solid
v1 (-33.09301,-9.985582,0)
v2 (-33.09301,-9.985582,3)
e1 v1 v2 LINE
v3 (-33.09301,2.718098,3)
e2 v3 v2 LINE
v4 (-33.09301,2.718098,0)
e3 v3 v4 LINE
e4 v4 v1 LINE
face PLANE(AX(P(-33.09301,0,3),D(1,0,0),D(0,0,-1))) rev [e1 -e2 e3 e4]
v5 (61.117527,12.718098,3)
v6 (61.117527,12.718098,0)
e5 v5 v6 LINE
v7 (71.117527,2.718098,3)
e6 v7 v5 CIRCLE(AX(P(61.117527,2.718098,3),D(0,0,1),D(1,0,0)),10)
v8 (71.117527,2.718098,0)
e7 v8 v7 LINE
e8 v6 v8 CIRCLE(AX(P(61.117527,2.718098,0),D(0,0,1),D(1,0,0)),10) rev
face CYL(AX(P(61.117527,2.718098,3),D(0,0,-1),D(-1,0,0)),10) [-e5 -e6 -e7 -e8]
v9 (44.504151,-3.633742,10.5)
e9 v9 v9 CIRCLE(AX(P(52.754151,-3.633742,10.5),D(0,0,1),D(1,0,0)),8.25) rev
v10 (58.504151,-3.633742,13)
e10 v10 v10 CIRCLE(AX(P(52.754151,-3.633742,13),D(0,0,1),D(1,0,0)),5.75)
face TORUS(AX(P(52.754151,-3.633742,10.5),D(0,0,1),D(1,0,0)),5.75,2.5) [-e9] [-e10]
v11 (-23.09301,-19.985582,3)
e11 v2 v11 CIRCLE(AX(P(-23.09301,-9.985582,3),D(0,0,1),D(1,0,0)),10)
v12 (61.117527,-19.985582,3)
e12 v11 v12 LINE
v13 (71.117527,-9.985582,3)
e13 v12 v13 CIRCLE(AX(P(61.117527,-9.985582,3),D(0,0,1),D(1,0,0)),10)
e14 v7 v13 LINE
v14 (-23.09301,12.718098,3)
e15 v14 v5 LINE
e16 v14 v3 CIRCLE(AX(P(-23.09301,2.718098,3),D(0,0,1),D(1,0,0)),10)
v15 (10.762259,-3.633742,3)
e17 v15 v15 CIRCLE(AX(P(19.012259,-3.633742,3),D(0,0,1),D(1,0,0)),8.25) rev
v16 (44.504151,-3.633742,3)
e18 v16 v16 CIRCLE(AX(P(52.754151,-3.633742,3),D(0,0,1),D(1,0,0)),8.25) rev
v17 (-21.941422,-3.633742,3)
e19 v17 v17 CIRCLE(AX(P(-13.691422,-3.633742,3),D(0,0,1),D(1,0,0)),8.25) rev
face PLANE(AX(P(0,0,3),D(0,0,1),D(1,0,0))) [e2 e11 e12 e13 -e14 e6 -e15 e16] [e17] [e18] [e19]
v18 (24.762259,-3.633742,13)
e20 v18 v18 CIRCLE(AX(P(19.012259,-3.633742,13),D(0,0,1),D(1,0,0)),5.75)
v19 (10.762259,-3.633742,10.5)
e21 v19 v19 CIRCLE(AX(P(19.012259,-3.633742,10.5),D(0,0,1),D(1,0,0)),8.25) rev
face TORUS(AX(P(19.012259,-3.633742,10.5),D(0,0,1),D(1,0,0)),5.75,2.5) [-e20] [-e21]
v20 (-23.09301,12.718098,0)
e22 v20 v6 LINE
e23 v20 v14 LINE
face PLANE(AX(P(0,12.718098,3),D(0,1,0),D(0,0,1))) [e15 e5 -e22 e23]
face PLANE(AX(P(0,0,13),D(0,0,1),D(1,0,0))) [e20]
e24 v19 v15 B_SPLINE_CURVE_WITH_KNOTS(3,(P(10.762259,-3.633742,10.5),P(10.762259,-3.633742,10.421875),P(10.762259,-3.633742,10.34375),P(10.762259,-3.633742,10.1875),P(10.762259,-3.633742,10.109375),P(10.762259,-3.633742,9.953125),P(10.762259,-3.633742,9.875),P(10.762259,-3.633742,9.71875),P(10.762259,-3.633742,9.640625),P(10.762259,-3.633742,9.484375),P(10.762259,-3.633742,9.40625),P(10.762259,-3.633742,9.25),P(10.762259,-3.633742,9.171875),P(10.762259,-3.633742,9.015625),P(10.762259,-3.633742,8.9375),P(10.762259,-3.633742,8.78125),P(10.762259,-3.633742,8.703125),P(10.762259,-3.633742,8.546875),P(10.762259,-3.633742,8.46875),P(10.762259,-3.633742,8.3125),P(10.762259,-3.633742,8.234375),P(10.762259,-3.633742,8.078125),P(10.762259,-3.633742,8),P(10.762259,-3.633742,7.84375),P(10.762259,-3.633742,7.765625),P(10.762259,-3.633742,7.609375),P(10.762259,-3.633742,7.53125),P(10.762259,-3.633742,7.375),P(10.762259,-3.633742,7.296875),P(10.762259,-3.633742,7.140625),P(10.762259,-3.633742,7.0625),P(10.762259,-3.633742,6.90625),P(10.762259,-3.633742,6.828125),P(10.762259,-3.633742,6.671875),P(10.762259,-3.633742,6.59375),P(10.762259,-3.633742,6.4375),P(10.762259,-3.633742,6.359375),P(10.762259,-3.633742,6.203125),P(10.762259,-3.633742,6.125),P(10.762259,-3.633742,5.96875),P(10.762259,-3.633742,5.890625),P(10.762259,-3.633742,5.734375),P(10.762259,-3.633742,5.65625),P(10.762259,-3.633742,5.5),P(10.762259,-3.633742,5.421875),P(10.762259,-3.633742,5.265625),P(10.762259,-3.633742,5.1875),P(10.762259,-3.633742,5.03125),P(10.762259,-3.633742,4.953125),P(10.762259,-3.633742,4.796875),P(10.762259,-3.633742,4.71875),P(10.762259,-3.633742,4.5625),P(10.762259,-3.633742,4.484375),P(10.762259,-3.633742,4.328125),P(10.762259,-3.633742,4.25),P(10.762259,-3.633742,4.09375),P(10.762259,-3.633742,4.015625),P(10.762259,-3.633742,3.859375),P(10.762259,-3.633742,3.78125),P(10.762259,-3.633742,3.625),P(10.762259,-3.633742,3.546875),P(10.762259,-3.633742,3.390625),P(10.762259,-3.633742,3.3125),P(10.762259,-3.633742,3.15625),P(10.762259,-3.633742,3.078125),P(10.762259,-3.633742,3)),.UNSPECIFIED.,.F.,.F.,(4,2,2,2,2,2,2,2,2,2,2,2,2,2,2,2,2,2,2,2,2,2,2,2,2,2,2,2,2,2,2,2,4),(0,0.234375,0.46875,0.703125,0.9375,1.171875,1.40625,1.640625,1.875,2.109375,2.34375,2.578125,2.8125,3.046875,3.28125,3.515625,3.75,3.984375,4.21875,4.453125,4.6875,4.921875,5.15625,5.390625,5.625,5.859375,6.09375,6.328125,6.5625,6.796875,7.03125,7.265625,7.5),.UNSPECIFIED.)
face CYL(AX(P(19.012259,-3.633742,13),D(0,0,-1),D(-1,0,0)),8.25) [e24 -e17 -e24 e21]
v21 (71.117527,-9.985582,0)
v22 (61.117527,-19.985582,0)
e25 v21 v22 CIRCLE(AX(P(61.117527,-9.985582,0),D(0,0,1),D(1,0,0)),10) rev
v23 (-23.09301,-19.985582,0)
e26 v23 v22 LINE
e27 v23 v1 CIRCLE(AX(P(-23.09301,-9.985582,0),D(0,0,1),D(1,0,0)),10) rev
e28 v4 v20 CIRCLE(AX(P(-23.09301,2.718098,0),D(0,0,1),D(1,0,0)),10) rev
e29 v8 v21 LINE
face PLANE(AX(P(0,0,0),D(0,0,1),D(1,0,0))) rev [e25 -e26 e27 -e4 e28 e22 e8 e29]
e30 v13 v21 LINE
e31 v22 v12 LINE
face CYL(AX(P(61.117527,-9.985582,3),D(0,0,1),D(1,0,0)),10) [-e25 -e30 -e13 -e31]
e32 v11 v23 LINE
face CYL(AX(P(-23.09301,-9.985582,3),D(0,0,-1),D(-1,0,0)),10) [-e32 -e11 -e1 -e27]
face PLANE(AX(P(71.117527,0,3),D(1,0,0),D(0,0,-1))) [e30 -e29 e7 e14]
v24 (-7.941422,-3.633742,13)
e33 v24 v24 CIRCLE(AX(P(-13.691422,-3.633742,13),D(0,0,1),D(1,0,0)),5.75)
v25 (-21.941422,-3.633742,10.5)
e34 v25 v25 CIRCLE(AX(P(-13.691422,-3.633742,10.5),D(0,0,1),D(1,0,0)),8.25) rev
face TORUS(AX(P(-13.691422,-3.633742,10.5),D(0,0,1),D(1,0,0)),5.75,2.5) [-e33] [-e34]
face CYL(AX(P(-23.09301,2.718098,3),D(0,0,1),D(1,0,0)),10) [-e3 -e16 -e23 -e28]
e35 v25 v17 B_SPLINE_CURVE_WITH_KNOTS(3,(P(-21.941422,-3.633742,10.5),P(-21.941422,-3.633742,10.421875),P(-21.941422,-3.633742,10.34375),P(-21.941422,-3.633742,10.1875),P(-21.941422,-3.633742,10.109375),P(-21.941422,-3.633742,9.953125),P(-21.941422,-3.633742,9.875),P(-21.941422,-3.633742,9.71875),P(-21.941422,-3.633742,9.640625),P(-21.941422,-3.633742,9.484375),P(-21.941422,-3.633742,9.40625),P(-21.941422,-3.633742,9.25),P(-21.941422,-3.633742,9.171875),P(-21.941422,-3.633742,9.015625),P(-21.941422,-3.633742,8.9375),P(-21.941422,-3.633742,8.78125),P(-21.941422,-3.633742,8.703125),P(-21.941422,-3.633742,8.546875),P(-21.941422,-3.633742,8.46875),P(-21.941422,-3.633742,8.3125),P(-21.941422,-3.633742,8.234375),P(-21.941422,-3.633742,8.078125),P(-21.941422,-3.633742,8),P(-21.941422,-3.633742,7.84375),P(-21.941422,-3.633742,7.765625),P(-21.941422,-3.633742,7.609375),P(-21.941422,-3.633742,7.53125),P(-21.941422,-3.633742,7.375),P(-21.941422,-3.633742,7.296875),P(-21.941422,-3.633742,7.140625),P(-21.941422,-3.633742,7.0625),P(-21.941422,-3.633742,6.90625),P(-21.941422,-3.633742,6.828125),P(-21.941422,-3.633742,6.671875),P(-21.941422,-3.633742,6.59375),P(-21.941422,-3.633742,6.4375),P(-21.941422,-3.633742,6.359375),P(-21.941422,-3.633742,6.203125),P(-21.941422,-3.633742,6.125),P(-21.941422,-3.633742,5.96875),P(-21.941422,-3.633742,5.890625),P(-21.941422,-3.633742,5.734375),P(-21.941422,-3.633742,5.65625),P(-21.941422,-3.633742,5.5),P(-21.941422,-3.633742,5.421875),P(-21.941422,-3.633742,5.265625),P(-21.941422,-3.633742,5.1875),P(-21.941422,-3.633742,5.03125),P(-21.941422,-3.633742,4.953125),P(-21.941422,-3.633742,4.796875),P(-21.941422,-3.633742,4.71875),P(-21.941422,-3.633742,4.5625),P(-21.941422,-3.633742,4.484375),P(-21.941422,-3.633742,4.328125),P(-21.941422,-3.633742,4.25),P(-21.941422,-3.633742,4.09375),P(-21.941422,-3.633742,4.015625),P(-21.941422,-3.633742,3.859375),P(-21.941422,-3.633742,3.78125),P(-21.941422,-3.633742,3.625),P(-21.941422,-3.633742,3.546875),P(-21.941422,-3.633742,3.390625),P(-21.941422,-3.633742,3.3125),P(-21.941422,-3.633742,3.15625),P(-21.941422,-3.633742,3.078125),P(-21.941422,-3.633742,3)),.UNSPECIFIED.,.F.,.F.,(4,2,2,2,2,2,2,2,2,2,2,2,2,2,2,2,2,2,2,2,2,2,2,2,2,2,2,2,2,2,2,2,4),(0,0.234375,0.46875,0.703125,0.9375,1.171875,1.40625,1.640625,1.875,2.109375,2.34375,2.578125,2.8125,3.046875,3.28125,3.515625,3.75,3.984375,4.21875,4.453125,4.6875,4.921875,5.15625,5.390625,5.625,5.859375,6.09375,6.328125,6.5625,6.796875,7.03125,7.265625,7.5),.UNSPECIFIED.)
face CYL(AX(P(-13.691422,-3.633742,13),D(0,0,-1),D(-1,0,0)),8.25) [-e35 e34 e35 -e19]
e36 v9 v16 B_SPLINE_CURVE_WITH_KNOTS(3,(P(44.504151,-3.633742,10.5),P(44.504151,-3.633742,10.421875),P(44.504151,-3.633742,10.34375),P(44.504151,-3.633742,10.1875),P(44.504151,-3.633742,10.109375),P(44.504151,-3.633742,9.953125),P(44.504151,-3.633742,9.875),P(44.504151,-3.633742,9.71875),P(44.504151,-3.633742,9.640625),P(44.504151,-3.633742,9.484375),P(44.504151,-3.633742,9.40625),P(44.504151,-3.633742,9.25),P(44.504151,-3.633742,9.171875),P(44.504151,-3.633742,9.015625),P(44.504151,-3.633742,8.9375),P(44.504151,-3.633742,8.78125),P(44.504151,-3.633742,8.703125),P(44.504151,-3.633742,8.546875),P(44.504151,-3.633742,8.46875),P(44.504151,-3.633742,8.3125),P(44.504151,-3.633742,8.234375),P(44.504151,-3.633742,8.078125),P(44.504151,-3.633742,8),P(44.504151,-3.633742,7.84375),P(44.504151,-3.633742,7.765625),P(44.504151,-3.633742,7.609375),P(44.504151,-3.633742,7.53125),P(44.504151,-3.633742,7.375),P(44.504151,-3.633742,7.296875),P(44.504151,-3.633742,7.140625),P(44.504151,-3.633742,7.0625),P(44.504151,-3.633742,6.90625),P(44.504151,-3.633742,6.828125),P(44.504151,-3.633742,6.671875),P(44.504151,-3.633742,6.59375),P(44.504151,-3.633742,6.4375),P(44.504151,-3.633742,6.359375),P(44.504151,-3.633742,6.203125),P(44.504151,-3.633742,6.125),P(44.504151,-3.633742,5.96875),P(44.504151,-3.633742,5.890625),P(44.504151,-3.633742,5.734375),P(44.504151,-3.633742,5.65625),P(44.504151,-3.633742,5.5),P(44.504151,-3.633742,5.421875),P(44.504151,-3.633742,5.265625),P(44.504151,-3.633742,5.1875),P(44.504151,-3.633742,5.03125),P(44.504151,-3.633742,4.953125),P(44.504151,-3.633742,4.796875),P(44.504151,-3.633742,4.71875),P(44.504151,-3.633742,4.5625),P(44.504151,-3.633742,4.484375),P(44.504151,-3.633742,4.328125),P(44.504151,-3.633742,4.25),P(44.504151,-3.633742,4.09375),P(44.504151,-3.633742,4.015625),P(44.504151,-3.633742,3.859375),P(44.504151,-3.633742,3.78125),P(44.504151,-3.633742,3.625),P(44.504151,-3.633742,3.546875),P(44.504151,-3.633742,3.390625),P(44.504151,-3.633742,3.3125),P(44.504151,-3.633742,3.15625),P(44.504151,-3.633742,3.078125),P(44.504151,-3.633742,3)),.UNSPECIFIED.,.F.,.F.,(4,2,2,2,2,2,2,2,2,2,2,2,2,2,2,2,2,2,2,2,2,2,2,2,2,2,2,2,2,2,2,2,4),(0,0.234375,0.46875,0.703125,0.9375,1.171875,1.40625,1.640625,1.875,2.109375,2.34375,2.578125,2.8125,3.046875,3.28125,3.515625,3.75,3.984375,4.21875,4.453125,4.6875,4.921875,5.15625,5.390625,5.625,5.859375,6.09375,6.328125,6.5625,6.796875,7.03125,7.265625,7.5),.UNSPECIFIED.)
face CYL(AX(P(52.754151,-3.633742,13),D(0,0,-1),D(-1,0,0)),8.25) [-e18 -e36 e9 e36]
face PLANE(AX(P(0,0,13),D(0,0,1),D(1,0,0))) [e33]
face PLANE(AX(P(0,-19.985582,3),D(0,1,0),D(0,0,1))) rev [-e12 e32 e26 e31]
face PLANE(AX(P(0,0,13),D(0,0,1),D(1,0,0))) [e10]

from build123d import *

# Parameters (mm, degrees)
SKETCH1_W           = 104.210537284
SKETCH1_H           = 32.703680443
BOSS_EXTRUDE1_DEPTH = 3
SKETCH1_3_R         = 8.25
BOSS_EXTRUDE2_DEPTH = 13
FILLET1_R           = 10
FILLET2_R           = 2.5


with BuildPart() as part:
    # Sketch1 → Boss-Extrude1 (new body)
    with BuildSketch(Plane.XY):
        with Locations((19.01225867, -3.633742272)):
            Rectangle(SKETCH1_W, SKETCH1_H)
    extrude(amount=BOSS_EXTRUDE1_DEPTH)

    # Sketch1<3> → Boss-Extrude2 (add)
    with BuildSketch(Plane.XY):
        with Locations((52.754151191, -3.633742271)):
            Circle(SKETCH1_3_R)
        with Locations((19.01225867, -3.633742271)):
            Circle(SKETCH1_3_R)
        with Locations((-13.691421773, -3.633742271)):
            Circle(SKETCH1_3_R)
    extrude(amount=BOSS_EXTRUDE2_DEPTH)

    # Fillet1
    fillet1_edges = [part.edges().sort_by_distance(p)[0] for p in [
        (71.117527312, 12.71809795, 1.5),
        (71.117527312, -19.985582493, 1.5),
        (-33.093009972, -19.985582493, 1.5),
        (-33.093009972, 12.71809795, 1.5),
    ]]
    fillet(fillet1_edges, radius=FILLET1_R)

    # Fillet2
    fillet2_edges = [part.edges().sort_by_distance(p)[0] for p in [
        (44.504151191, -3.633742271, 13),
        (10.76225867, -3.633742271, 13),
        (-21.941421773, -3.633742271, 13),
    ]]
    fillet(fillet2_edges, radius=FILLET2_R)


solid = part.part
